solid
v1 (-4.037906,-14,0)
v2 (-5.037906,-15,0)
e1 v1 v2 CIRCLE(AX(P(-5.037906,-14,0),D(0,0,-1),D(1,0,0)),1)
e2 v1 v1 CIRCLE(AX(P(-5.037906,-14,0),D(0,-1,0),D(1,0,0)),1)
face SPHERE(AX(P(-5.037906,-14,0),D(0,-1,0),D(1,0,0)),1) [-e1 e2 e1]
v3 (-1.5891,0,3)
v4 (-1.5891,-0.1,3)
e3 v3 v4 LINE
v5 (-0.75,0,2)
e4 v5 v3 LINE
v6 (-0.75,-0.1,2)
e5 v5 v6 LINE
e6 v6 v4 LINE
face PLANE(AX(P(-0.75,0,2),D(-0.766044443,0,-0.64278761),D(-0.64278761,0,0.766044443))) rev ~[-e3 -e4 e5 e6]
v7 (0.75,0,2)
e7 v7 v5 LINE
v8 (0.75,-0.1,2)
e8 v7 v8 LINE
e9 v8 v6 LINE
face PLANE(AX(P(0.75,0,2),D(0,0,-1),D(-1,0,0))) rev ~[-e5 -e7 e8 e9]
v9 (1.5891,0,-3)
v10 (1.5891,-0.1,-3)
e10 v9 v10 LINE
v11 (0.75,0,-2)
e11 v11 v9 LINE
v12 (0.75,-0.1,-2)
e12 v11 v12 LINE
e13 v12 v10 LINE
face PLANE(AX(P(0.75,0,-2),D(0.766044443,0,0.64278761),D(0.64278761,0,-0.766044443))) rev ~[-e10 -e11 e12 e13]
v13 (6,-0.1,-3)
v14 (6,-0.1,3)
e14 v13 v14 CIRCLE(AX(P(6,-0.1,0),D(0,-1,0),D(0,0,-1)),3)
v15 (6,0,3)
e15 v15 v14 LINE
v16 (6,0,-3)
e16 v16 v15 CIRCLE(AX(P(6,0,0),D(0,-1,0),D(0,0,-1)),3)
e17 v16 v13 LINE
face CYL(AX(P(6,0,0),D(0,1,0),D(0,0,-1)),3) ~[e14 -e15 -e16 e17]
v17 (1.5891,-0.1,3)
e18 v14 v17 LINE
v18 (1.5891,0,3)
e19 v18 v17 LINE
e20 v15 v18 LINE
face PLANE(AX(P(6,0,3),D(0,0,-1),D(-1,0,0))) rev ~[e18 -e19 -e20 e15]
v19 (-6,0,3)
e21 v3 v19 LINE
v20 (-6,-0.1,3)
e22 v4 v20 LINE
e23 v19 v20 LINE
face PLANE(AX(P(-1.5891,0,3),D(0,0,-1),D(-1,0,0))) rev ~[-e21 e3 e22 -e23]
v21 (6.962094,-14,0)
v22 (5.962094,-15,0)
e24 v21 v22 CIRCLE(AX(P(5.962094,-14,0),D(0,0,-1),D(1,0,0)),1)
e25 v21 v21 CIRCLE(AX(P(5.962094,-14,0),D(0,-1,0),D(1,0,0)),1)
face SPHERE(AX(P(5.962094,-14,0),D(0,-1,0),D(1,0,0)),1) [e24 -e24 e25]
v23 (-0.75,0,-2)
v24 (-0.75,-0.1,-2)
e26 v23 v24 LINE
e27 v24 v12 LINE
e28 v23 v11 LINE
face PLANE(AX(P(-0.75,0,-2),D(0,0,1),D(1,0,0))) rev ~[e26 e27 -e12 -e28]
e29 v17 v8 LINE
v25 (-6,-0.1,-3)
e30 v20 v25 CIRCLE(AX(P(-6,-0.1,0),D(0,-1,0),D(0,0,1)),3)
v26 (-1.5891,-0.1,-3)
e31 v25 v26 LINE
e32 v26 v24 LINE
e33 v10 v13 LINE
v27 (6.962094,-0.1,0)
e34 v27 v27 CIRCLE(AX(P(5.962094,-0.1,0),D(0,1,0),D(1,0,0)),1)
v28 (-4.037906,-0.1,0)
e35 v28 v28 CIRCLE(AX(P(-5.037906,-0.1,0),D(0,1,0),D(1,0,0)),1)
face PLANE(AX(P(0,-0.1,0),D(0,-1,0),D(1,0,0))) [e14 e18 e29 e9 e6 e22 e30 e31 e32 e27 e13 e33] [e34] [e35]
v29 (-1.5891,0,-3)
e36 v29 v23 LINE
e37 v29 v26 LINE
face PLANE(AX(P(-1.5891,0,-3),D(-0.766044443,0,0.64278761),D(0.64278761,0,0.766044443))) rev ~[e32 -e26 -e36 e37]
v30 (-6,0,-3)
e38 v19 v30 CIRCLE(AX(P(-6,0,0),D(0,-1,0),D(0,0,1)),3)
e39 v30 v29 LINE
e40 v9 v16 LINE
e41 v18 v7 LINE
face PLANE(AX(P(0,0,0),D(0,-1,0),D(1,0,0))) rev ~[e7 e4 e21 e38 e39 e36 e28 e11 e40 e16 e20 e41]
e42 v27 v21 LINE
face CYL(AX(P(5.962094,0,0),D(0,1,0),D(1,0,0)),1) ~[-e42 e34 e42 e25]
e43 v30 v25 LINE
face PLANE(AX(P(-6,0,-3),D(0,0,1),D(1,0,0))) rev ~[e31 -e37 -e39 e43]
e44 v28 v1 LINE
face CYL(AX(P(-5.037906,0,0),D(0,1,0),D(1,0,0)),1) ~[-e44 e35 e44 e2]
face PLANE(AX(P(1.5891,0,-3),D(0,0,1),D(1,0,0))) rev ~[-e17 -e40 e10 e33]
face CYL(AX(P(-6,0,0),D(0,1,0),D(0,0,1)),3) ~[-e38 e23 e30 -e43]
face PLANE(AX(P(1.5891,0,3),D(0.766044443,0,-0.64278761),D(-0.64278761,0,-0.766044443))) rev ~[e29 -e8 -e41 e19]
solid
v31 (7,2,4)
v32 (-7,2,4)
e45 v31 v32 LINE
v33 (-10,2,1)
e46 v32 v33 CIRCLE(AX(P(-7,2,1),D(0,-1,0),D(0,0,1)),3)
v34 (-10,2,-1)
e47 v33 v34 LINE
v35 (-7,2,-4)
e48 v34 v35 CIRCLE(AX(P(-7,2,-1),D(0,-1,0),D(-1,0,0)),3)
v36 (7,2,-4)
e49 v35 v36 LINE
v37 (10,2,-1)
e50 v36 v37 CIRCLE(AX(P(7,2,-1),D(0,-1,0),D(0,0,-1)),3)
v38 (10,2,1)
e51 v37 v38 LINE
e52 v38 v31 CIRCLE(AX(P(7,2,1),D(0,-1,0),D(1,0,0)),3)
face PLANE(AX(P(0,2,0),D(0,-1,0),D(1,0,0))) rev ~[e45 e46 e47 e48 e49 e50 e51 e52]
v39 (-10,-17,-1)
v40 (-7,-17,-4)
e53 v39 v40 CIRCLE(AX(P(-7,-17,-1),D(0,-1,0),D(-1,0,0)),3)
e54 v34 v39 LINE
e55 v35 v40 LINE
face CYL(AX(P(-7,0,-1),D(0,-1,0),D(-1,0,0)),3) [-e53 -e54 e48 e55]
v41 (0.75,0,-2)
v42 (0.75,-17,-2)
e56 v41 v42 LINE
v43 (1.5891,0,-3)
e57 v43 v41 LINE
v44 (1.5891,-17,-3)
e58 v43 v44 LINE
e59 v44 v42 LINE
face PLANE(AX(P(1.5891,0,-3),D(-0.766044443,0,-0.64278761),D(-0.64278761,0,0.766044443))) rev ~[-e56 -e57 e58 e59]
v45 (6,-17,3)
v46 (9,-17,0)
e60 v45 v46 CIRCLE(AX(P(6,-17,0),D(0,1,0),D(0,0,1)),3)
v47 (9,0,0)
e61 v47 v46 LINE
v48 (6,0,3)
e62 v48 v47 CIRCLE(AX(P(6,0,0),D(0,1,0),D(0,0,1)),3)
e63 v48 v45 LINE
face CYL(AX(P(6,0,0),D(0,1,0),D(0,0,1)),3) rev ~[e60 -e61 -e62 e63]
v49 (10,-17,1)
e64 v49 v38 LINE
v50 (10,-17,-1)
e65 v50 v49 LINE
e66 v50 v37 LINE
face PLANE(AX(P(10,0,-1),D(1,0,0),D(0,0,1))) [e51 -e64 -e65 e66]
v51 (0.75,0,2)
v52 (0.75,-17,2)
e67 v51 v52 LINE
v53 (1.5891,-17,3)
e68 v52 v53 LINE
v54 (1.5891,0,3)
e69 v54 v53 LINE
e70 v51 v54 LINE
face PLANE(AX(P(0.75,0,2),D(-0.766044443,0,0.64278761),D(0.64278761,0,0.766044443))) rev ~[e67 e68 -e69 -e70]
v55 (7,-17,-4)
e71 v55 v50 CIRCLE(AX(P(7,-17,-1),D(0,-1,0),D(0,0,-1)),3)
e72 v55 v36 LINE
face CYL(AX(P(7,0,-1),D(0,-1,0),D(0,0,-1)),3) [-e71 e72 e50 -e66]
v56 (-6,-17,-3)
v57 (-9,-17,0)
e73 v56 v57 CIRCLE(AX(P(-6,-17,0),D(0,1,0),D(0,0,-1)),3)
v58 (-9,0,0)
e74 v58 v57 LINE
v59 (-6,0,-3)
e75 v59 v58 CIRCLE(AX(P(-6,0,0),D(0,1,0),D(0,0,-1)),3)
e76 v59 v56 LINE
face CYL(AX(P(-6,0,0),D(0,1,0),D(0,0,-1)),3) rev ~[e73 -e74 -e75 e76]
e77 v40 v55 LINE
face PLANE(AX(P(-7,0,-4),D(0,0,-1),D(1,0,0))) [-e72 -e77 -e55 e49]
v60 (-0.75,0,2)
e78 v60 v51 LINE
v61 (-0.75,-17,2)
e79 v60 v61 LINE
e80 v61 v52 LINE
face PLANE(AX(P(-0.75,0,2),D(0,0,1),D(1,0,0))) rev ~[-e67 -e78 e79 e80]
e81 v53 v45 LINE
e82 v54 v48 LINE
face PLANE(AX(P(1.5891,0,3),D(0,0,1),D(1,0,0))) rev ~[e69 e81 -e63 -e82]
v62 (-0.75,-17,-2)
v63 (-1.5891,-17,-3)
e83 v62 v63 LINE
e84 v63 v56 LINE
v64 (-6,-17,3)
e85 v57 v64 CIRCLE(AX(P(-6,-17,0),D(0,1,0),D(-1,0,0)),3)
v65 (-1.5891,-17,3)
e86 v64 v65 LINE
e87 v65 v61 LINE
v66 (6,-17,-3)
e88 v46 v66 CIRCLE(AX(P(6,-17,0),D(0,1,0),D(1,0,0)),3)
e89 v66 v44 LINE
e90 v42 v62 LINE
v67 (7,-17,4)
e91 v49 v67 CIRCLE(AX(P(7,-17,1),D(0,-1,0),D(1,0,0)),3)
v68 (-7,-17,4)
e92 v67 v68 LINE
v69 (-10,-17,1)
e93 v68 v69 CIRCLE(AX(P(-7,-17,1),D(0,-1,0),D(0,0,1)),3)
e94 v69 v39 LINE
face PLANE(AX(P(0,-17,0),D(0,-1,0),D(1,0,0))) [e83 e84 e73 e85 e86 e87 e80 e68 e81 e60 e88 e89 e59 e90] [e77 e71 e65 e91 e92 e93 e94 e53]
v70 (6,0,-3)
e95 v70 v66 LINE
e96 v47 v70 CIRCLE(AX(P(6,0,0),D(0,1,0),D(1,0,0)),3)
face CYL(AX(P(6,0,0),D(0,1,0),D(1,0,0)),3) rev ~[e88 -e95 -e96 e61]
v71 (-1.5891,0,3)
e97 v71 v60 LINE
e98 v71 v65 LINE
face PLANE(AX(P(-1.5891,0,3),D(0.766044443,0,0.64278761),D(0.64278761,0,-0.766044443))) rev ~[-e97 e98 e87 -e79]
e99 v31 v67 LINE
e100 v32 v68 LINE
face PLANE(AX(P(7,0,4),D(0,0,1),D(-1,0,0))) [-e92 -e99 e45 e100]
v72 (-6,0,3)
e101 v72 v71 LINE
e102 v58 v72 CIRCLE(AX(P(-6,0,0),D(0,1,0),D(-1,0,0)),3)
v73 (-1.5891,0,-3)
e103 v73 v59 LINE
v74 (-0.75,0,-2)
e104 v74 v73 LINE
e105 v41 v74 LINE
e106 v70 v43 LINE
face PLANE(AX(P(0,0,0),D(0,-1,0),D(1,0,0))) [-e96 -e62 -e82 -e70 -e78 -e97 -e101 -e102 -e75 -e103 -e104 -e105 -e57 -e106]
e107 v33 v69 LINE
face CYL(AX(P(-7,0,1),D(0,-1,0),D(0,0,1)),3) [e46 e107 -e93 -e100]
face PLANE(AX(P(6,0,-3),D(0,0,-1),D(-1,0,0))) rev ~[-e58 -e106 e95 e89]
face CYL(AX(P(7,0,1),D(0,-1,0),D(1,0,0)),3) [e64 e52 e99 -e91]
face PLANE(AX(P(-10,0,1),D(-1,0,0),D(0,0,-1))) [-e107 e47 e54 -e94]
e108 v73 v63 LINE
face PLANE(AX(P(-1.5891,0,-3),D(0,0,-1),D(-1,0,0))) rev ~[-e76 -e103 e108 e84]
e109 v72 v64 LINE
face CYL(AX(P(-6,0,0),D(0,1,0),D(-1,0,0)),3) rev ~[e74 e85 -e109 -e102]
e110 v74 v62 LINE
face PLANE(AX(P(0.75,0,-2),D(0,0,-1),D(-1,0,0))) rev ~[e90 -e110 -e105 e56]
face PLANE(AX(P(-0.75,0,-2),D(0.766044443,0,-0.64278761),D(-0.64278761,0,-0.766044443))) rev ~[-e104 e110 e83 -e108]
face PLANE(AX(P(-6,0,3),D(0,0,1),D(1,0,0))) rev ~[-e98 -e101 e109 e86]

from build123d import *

# Parameters (mm, degrees)
F1_DEPTH = 17
F2_R     = 1
F3_DEPTH = 15
F4_R     = 1
F4_2_R   = 1
F6_DEPTH = 2
F8_DEPTH = 0.1


with BuildPart() as f1:
    # F0 (on Front) → F1 (new body)
    with BuildSketch(Plane.XZ):
        with BuildLine():
            ThreePointArc((10, 1), (9.1213203436, 3.1213203436), (7, 4))
            Line((7, 4), (-7, 4))
            ThreePointArc((-7, 4), (-9.1213203436, 3.1213203436), (-10, 1))
            Line((-10, 1), (-10, -1))
            ThreePointArc((-10, -1), (-9.1213203436, -3.1213203436), (-7, -4))
            Line((-7, -4), (7, -4))
            ThreePointArc((7, -4), (9.1213203436, -3.1213203436), (10, -1))
            Line((10, -1), (10, 1))
        make_face()
        with BuildLine():
            ThreePointArc((-9, 0), (-8.1213203436, 2.1213203436), (-6, 3))
            Line((-6, 3), (-1.5890996312, 3))
            Line((-1.5890996312, 3), (-0.75, 2))
            Line((-0.75, 2), (0, 2))
            Line((0, 2), (0.75, 2))
            Line((0.75, 2), (1.5890996312, 3))
            Line((1.5890996312, 3), (6, 3))
            ThreePointArc((6, 3), (8.1213203436, 2.1213203436), (9, 0))
            ThreePointArc((9, 0), (8.1213203436, -2.1213203436), (6, -3))
            Line((6, -3), (1.5890996312, -3))
            Line((1.5890996312, -3), (0.75, -2))
            Line((0.75, -2), (0, -2))
            Line((0, -2), (-0.75, -2))
            Line((-0.75, -2), (-1.5890996312, -3))
            Line((-1.5890996312, -3), (-6, -3))
            ThreePointArc((-6, -3), (-8.1213203436, -2.1213203436), (-9, 0))
        make_face(mode=Mode.SUBTRACT)
    extrude(amount=F1_DEPTH)

    # F5 (on face) → F6 (join)
    with BuildSketch(Plane.XZ):
        with BuildLine():
            ThreePointArc((10, 1), (9.1213203436, 3.1213203436), (7, 4))
            Line((7, 4), (-7, 4))
            ThreePointArc((-7, 4), (-9.1213203436, 3.1213203436), (-10, 1))
            Line((-10, 1), (-10, -1))
            ThreePointArc((-10, -1), (-9.1213203436, -3.1213203436), (-7, -4))
            Line((-7, -4), (7, -4))
            ThreePointArc((7, -4), (9.1213203436, -3.1213203436), (10, -1))
            Line((10, -1), (10, 1))
        make_face()
    extrude(amount=-F6_DEPTH)


with BuildPart() as f3:
    # F2 (on Front) → F3 (new body)
    with BuildSketch(Plane.XZ):
        with Locations((-5.0379058985, 0)):
            Circle(F2_R)
    extrude(amount=F3_DEPTH)

    # F4
    f4_edges = [f3.edges().sort_by_distance(p)[0] for p in [
        (-6.037906, -15, 0),
    ]]
    fillet(f4_edges, radius=F4_R)



with BuildPart() as f3b:
    # F2 (on Front) → F3, piece 2 (new body)
    with BuildSketch(Plane.XZ):
        with Locations((5.9620941015, 0)):
            Circle(F2_R)
    extrude(amount=F3_DEPTH)

    # F4#2
    f4_2_edges = [f3b.edges().sort_by_distance(p)[0] for p in [
        (4.962094, -15, 0),
    ]]
    fillet(f4_2_edges, radius=F4_2_R)


with BuildPart() as f3_1:
    add(f3.part)

    add(f3b.part)  # F8 merges F3b
    # F7 (on face) → F8 (join)
    with BuildSketch(Plane.XZ):
        with BuildLine():
            Line((-0.75, 2), (-1.5890996312, 3))
            Line((-1.5890996312, 3), (-6, 3))
            ThreePointArc((-6, 3), (-9, 0), (-6, -3))
            Line((-6, -3), (-1.5890996312, -3))
            Line((-1.5890996312, -3), (-0.75, -2))
            Line((-0.75, -2), (0.75, -2))
            Line((0.75, -2), (1.5890996312, -3))
            Line((1.5890996312, -3), (6, -3))
            ThreePointArc((6, -3), (9, 0), (6, 3))
            Line((6, 3), (1.5890996312, 3))
            Line((1.5890996312, 3), (0.75, 2))
            Line((0.75, 2), (-0.75, 2))
        make_face()
    extrude(amount=F8_DEPTH)


solid = Compound([f1.part, f3_1.part])
